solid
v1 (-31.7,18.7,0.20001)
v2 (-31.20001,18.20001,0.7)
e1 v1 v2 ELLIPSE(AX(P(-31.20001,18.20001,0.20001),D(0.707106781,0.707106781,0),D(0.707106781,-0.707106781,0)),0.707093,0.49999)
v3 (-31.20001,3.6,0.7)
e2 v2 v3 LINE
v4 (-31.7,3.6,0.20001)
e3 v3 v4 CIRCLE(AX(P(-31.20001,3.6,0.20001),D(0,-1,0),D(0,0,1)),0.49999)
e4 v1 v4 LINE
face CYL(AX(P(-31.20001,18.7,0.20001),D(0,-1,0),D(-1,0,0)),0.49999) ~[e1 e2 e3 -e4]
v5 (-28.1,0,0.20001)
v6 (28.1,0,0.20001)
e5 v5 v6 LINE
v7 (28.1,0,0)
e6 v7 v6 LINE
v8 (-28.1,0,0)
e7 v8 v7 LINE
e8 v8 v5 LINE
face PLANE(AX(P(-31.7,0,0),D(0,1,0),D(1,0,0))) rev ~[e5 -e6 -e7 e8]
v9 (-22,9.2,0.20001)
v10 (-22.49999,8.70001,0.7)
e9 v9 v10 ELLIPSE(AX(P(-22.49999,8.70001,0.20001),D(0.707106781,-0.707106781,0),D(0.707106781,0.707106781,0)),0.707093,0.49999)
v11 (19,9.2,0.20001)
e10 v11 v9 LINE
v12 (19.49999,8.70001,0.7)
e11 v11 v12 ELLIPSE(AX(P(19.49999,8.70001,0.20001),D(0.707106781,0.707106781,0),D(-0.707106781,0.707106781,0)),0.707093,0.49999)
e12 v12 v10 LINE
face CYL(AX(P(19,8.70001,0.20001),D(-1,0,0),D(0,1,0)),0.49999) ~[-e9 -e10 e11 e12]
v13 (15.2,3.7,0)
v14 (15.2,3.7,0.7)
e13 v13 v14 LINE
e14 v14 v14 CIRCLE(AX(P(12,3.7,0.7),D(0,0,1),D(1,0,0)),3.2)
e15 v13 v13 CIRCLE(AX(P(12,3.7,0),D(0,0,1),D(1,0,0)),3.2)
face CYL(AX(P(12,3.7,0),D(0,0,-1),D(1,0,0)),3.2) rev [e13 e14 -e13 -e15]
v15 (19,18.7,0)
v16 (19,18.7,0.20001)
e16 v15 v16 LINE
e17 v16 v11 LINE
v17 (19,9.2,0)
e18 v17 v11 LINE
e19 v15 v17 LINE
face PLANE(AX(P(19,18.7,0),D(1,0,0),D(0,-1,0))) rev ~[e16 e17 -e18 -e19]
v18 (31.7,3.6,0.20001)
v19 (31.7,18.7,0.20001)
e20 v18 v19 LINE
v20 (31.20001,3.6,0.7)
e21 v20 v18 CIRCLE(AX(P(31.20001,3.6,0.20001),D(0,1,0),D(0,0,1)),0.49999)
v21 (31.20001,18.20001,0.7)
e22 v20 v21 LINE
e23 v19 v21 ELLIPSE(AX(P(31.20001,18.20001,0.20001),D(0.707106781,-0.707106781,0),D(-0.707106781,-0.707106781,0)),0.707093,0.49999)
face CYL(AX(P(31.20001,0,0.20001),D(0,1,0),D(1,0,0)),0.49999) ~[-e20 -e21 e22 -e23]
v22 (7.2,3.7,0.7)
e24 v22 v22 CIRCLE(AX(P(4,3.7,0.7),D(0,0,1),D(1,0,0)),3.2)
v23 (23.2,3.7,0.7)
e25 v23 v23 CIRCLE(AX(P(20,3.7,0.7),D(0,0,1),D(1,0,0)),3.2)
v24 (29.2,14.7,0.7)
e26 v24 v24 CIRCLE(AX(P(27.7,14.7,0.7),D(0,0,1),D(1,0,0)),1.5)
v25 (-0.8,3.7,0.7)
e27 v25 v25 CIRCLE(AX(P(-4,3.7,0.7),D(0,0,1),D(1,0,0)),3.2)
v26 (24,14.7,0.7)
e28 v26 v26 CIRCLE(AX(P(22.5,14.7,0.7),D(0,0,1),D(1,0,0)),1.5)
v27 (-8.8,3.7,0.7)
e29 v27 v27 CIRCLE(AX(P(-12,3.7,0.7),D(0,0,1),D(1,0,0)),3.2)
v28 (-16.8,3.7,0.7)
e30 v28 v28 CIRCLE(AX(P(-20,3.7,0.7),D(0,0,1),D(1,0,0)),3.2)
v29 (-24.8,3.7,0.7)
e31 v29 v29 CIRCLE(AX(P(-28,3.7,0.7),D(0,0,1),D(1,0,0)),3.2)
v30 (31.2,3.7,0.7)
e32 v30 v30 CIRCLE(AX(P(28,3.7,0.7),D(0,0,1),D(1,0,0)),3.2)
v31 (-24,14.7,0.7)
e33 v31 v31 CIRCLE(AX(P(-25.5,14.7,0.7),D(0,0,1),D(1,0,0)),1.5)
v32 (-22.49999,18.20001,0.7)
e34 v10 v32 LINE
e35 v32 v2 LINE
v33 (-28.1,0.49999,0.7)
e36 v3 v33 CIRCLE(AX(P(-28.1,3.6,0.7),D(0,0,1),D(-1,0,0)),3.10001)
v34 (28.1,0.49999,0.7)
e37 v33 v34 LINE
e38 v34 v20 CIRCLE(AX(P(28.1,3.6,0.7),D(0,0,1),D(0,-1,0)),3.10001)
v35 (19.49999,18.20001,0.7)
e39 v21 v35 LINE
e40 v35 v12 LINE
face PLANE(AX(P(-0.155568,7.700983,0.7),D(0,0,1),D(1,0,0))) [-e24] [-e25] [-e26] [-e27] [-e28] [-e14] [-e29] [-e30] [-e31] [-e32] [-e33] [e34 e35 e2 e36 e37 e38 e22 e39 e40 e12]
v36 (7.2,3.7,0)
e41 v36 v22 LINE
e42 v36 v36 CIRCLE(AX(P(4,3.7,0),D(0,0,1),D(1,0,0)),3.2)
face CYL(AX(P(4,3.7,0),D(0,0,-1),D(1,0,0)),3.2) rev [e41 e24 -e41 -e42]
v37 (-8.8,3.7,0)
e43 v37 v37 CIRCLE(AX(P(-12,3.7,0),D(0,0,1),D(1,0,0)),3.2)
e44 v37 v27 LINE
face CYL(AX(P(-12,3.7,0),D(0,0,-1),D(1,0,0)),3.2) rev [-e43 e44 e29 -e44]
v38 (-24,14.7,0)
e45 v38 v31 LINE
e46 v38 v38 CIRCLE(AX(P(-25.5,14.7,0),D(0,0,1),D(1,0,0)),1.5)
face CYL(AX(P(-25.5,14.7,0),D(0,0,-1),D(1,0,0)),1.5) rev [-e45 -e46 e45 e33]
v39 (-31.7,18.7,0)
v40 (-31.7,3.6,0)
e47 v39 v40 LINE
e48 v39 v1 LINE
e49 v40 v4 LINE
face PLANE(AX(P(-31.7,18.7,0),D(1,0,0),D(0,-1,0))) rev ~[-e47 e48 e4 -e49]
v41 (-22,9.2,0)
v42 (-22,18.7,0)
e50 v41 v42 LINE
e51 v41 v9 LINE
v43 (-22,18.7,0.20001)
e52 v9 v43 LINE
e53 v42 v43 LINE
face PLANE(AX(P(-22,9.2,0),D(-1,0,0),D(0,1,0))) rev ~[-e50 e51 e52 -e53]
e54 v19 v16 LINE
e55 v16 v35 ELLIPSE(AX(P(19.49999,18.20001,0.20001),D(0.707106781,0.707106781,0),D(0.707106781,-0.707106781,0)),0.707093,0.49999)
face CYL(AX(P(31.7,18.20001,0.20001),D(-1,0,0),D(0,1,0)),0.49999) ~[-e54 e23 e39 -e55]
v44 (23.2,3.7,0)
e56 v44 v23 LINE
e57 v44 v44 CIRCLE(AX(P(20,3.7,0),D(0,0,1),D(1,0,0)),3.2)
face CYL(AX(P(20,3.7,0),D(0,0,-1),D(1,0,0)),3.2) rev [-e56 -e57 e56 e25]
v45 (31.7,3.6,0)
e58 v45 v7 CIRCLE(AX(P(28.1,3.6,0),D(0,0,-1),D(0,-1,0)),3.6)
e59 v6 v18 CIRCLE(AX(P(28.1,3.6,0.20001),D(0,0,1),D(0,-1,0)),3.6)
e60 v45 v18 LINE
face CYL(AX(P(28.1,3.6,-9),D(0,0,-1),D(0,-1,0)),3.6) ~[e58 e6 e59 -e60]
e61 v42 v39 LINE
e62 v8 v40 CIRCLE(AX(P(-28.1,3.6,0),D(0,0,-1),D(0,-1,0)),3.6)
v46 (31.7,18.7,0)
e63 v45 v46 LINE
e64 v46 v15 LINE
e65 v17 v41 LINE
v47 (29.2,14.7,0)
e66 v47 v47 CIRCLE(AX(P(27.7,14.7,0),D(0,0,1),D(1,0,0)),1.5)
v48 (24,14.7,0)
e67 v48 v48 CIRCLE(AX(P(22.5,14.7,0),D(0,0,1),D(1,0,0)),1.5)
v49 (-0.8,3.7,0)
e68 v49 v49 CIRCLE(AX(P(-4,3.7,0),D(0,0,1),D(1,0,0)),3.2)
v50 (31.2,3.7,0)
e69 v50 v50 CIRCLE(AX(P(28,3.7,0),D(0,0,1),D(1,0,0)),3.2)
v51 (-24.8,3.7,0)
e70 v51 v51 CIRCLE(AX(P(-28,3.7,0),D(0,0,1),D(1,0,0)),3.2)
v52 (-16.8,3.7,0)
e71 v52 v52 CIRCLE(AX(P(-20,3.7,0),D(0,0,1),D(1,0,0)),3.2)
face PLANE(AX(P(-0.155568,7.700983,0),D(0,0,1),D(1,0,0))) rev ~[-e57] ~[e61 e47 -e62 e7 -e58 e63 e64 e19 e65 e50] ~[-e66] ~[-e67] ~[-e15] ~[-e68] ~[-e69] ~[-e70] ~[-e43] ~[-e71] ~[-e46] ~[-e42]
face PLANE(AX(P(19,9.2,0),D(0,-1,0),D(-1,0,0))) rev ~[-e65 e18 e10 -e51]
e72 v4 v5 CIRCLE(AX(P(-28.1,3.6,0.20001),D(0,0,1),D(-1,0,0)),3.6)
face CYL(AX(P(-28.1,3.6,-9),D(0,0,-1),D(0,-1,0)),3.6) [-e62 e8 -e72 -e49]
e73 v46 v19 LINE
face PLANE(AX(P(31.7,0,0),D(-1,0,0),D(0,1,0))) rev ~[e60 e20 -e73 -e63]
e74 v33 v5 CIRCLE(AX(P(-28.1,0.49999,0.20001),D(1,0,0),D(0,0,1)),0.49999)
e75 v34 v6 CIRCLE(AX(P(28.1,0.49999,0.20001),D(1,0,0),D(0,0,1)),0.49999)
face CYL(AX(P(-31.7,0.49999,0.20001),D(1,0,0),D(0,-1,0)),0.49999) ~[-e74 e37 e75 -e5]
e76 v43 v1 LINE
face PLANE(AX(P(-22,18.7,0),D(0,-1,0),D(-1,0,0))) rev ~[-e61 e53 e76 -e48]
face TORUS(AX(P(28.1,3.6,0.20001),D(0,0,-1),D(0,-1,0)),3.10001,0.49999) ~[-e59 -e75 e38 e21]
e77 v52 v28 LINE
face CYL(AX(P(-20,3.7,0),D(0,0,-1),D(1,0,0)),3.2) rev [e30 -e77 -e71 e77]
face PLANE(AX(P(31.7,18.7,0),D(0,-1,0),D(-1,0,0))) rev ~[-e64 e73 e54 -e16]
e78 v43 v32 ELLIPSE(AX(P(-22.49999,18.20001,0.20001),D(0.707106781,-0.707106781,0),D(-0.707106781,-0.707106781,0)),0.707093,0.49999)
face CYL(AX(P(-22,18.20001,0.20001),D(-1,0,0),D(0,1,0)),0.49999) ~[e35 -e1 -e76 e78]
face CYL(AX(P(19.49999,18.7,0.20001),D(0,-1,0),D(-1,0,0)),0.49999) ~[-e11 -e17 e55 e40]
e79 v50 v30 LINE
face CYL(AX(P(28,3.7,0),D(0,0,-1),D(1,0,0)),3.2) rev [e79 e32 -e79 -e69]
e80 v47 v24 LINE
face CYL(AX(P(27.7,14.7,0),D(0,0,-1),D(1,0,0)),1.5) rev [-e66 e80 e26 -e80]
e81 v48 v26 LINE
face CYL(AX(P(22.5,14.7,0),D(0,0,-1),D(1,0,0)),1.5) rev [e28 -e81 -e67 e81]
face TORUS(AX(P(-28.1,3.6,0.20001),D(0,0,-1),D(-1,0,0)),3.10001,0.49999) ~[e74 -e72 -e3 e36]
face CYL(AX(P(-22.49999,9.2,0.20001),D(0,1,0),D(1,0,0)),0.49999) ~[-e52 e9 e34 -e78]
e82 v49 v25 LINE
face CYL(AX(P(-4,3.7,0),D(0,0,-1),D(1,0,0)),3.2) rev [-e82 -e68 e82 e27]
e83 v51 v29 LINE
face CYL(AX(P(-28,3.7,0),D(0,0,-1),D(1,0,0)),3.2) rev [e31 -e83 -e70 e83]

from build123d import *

# Parameters (mm, degrees)
F0_R        = 3.2
F0_R_2      = 1.5
F1_DEPTH    = 0.7
F2_R        = 0.49999
F3_T1_DEPTH = 9.7
F3_T4_ANGLE = 90
F3_T6_ANGLE = 90


# Not quite as in the source:
# - a fillet or chamfer that OpenCascade refuses, or shapes differently, is made with other operations: its cross-section is extruded or revolved along the edge and cut away or added
# - a fillet or chamfer is up to 0.001 mm smaller than in the source, because OpenCascade refuses the exact size
# - a feature names something its author has since deleted; it is built from what else it names


with BuildPart() as f1:
    # F0 (on Top) → F1 (new body)
    with BuildSketch(Plane.XY):
        Polygon((-22, 18.7), (-31.7, 18.7), (-31.7, 0), (-18.3513443917, 0), (-10.3513443917, 0), (31.7, 0), (31.7, 18.7), (19, 18.7), (19, 9.2), (-22, 9.2), align=None)
        with Locations((-28, 3.7)):
            Circle(F0_R, mode=Mode.SUBTRACT)
        with Locations((-20, 3.7)):
            Circle(F0_R, mode=Mode.SUBTRACT)
        with Locations((-12, 3.7)):
            Circle(F0_R, mode=Mode.SUBTRACT)
        with Locations((-4, 3.7)):
            Circle(F0_R, mode=Mode.SUBTRACT)
        with Locations((4, 3.7)):
            Circle(F0_R, mode=Mode.SUBTRACT)
        with Locations((12, 3.7)):
            Circle(F0_R, mode=Mode.SUBTRACT)
        with Locations((20, 3.7)):
            Circle(F0_R, mode=Mode.SUBTRACT)
        with Locations((28, 3.7)):
            Circle(F0_R, mode=Mode.SUBTRACT)
        with Locations((-25.5, 14.7)):
            Circle(F0_R_2, mode=Mode.SUBTRACT)
        with Locations((22.5, 14.7)):
            Circle(F0_R_2, mode=Mode.SUBTRACT)
        with Locations((27.7, 14.7)):
            Circle(F0_R_2, mode=Mode.SUBTRACT)
    extrude(amount=F1_DEPTH)

    # F2 (radius 0.5 in the source; OpenCascade refuses exactly that, so slightly less here)
    f2_edges = [f1.edges().sort_by_distance(p)[0] for p in [
        (0, 0, 0.7),
        (-31.7, 9.35, 0.7),
        (-26.85, 18.7, 0.7),
        (-22, 13.95, 0.7),
        (-1.5, 9.2, 0.7),
        (19, 13.95, 0.7),
        (25.35, 18.7, 0.7),
        (31.7, 9.35, 0.7),
    ]]
    fillet(f2_edges, radius=F2_R)

    # F3: fillet of radius 3.6 on 4 edges, made by hand

    # F3_s2 → F3_t1 (cut)
    with BuildSketch(Plane.XY.offset(-9)):
        with BuildLine():
            ThreePointArc((-28.1, 0), (-30.6455844123, 1.0544155877), (-31.7, 3.6))
            Line((-31.7, 3.6), (-31.7, 0))
            Line((-31.7, 0), (-28.1, 0))
        make_face()
        with BuildLine():
            ThreePointArc((28.1, 0), (30.6455844123, 1.0544155877), (31.7, 3.6))
            Line((31.7, 3.6), (31.7, 0))
            Line((31.7, 0), (28.1, 0))
        make_face()
    extrude(amount=F3_T1_DEPTH, mode=Mode.SUBTRACT)

    # F3_s3 → F3_t4 (revolve, cut)
    with BuildSketch(Plane.XZ.offset(-3.6)):
        with BuildLine():
            ThreePointArc((-31.20001, 0.7), (-31.5535563195, 0.5535563195), (-31.7, 0.20001))
            Line((-31.7, 0.20001), (-31.7, 0.7))
            Line((-31.7, 0.7), (-31.20001, 0.7))
        make_face()
    revolve(axis=Axis((-28.1, 3.6, 0.7), (0, 0, 1)), revolution_arc=F3_T4_ANGLE, mode=Mode.SUBTRACT)

    # F3_s5 → F3_t6 (revolve, cut)
    with BuildSketch(Plane.YZ.offset(28.1)):
        with BuildLine():
            ThreePointArc((0.49999, 0.7), (0.1464436805, 0.5535563195), (0, 0.20001))
            Line((0, 0.20001), (0, 0.7))
            Line((0, 0.7), (0.49999, 0.7))
        make_face()
    revolve(axis=Axis((28.1, 3.6, 0.7), (0, 0, 1)), revolution_arc=F3_T6_ANGLE, mode=Mode.SUBTRACT)


solid = f1.part
